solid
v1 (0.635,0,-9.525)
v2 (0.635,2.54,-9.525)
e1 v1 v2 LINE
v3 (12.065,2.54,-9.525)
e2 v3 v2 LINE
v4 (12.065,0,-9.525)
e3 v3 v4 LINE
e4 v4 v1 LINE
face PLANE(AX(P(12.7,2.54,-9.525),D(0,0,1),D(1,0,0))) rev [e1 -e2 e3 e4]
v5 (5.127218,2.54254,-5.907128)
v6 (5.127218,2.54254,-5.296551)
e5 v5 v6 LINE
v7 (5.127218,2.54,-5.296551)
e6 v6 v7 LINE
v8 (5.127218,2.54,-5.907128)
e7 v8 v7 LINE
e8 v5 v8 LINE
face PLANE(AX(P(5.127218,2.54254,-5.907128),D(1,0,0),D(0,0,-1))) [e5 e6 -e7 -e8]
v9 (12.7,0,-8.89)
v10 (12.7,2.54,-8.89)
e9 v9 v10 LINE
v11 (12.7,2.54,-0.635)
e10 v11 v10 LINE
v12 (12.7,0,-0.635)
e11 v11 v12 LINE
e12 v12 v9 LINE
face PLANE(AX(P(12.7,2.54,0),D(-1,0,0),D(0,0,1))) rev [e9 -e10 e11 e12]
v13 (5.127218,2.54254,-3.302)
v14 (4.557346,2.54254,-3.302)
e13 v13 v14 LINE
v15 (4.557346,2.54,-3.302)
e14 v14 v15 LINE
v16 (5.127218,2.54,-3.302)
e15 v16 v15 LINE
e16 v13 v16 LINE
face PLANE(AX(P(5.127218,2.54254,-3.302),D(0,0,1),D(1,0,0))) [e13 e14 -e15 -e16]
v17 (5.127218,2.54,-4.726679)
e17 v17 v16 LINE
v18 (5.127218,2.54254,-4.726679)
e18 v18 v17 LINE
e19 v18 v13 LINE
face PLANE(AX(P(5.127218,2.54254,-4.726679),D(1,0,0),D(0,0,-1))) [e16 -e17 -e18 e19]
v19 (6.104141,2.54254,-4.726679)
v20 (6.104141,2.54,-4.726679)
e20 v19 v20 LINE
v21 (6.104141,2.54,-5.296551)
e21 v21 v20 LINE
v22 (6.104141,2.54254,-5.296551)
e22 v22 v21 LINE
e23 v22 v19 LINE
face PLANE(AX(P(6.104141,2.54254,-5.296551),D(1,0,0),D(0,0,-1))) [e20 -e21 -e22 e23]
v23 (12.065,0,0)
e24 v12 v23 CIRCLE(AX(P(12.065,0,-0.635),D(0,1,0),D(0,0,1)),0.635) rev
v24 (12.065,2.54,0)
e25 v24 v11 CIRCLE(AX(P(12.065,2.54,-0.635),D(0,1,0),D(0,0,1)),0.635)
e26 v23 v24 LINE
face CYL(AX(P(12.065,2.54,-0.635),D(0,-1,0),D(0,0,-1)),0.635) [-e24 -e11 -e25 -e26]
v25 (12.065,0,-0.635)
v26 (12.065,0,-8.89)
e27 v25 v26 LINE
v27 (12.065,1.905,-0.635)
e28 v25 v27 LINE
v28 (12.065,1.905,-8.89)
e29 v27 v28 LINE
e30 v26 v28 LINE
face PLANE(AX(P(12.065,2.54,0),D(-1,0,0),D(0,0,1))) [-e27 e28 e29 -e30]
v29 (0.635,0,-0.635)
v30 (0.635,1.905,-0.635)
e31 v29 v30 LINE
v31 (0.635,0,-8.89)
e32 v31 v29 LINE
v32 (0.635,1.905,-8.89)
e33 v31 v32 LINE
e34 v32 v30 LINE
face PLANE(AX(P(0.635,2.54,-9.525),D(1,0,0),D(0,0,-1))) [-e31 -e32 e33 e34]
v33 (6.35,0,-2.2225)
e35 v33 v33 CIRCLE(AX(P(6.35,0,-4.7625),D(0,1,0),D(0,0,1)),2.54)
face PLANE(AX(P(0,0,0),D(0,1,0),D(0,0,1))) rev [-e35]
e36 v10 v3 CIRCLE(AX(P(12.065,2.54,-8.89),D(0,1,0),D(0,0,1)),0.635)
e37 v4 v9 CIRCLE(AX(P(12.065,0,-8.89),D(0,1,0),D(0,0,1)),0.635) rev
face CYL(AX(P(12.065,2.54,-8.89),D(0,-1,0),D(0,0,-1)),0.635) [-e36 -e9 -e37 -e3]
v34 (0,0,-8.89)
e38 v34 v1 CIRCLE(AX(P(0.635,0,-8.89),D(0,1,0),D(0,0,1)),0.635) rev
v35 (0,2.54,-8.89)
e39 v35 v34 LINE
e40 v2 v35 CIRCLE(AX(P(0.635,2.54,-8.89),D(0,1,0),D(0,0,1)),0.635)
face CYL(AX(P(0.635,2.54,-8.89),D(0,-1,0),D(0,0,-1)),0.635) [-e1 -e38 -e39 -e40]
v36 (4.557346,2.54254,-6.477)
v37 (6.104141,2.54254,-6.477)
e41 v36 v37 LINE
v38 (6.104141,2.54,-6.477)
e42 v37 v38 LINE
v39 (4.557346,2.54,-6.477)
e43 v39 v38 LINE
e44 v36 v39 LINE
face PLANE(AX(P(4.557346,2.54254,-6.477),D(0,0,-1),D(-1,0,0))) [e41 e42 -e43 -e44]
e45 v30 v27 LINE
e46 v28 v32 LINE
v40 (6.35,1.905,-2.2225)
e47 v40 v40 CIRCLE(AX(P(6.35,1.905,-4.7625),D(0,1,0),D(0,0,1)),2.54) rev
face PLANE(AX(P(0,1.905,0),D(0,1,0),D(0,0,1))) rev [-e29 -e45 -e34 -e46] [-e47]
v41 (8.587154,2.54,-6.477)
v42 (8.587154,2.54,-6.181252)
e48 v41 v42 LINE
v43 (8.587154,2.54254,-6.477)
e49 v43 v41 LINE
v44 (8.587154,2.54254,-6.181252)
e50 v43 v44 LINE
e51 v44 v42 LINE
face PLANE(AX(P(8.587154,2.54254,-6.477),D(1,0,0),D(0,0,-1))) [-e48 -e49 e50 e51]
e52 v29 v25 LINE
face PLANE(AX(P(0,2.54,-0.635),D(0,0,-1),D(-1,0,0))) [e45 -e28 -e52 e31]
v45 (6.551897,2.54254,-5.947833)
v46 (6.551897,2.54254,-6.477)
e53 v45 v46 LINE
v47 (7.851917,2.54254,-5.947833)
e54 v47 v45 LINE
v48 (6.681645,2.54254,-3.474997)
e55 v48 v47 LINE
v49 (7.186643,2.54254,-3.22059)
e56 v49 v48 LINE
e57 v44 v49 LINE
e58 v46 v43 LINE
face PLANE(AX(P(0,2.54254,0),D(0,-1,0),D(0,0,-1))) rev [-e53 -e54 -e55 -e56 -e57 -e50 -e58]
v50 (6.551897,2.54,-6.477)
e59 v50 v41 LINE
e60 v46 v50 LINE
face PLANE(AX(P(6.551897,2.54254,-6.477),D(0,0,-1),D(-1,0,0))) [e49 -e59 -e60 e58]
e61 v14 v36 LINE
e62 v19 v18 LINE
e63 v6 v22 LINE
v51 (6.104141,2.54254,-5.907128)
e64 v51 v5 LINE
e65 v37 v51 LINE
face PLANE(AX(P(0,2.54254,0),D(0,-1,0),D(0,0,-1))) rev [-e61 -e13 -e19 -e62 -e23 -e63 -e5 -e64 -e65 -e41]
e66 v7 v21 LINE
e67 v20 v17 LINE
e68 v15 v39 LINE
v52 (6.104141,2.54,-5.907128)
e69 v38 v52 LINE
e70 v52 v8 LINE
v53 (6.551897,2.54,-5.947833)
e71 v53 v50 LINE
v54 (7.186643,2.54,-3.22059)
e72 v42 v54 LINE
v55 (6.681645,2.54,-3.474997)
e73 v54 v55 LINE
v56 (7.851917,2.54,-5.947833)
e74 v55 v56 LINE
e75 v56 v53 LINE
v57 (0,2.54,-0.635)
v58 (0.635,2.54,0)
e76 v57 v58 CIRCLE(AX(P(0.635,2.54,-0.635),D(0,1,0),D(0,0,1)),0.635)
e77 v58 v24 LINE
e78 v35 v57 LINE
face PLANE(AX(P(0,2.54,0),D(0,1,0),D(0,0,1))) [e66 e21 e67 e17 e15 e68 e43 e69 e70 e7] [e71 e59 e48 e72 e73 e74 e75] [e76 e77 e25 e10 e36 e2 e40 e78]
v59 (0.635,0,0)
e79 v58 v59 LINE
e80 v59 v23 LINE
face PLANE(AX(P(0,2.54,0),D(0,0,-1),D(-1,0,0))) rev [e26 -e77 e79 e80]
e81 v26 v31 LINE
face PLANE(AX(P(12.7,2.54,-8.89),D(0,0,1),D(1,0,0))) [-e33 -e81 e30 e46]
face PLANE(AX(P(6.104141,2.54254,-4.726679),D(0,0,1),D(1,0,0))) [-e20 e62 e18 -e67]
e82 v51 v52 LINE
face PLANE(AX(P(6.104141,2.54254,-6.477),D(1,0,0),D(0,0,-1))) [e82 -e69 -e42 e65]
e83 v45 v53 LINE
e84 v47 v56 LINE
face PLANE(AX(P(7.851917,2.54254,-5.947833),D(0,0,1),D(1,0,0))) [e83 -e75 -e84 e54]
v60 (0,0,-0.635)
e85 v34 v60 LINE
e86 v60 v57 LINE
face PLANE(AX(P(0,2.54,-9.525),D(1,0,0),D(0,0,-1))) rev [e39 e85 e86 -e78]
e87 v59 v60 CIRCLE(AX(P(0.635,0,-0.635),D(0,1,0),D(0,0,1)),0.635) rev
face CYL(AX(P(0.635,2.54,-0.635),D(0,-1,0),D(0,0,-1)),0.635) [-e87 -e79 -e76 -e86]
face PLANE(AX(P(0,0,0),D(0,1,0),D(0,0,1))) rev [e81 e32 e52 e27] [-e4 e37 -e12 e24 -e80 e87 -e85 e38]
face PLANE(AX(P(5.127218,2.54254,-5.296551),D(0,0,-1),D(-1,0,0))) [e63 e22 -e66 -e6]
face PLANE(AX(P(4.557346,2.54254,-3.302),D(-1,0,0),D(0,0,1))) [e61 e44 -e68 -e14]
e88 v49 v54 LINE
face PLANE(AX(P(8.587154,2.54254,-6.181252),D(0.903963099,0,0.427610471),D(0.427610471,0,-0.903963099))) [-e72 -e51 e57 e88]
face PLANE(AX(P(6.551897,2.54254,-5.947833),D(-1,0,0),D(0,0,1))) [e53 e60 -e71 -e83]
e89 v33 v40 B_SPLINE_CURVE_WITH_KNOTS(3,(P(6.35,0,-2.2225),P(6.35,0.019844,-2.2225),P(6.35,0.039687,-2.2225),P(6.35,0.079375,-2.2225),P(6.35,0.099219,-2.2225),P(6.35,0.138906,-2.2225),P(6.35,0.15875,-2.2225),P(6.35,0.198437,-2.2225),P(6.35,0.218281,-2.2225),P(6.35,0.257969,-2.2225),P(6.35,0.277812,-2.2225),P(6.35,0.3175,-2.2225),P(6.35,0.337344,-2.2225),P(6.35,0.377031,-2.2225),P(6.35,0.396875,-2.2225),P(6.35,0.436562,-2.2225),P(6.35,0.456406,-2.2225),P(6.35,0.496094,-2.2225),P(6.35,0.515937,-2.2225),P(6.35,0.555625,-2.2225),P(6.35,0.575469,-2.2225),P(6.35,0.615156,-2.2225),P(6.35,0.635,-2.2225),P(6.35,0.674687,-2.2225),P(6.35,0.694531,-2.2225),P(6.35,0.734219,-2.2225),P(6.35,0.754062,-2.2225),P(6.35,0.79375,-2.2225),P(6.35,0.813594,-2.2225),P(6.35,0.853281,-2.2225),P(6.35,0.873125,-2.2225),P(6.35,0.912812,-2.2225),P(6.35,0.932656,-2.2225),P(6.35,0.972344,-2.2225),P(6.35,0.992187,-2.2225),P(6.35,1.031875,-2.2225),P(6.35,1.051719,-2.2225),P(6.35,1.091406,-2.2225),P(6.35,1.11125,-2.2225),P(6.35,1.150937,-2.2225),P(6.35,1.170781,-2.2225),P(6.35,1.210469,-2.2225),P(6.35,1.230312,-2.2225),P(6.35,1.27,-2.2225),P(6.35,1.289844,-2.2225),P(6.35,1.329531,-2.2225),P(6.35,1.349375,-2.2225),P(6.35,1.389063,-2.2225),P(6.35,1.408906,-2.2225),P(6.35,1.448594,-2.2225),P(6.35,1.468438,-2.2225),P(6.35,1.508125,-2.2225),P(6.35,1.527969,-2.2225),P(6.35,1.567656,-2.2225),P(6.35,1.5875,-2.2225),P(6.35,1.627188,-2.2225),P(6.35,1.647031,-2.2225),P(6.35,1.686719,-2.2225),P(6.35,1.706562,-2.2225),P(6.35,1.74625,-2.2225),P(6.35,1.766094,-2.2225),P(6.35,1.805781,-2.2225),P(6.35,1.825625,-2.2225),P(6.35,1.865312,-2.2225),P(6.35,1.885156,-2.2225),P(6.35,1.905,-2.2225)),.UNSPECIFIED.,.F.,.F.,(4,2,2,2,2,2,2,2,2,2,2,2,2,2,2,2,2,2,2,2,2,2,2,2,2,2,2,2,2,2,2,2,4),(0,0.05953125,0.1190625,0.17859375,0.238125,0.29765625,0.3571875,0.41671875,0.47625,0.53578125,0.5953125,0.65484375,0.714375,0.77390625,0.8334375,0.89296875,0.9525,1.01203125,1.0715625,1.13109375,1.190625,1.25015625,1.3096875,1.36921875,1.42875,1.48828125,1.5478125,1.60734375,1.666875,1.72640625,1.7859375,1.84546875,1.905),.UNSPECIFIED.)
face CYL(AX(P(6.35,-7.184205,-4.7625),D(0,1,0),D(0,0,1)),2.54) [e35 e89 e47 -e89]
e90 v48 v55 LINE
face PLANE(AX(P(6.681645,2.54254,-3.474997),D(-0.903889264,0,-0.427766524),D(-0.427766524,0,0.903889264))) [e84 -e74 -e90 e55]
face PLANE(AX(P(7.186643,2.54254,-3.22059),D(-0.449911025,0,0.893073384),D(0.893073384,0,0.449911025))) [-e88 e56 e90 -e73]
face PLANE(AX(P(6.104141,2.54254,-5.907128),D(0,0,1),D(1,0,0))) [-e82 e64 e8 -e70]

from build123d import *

# Parameters (mm, degrees)
SKETCH1_W           = 12.7
SKETCH1_H           = 9.525
BOSS_EXTRUDE1_DEPTH = 2.54
FILLET1_R           = 0.635
SHELL1_START        = 0.635
SHELL1_OUTLINE_W    = 1.905
SHELL1_OUTLINE_H    = 8.255
SHELL1_DEPTH        = 11.43
SKETCH2_R           = 2.54
BOSS_EXTRUDE2_DEPTH = 1.905
BOSS_EXTRUDE3_DEPTH = 0.00254


# Read off the part's stored shape, not the designer's step: Shell1
with BuildPart() as part:
    # Sketch1 → Boss-Extrude1 (new body)
    with BuildSketch(Plane(origin=(0, 0, 0), x_dir=(1, 0, 0), z_dir=(0, 1, 0))):
        with Locations((6.35, 4.7625)):
            Rectangle(SKETCH1_W, SKETCH1_H)
    extrude(amount=BOSS_EXTRUDE1_DEPTH)

    # Fillet1
    fillet1_edges = [part.edges().sort_by_distance(p)[0] for p in [
        (0, 1.27, -9.525),
        (12.7, 1.27, -9.525),
        (12.7, 1.27, 0),
        (0, 1.27, 0),
    ]]
    fillet(fillet1_edges, radius=FILLET1_R)

    # Shell1 outline → Shell1 (cut)
    with BuildSketch(Plane.YZ.offset(SHELL1_START)):
        with Locations((0.9525, -4.7625)):
            Rectangle(SHELL1_OUTLINE_W, SHELL1_OUTLINE_H)
    extrude(amount=SHELL1_DEPTH, mode=Mode.SUBTRACT)

    # Sketch2 → Boss-Extrude2 (add)
    with BuildSketch(Plane(origin=(0, 1.905, 0), x_dir=(-1, 0, 0), z_dir=(0, -1, 0))):
        with Locations(Location((-6.35, 4.7625, 0), (0, 0, 270))):
            Circle(SKETCH2_R)
    extrude(amount=BOSS_EXTRUDE2_DEPTH)

    # Sketch3 → Boss-Extrude3 (add)
    with BuildSketch(Plane(origin=(0, 2.54, 0), x_dir=(1, 0, 0), z_dir=(0, 1, 0))):
        Polygon((4.557346154, 6.477), (6.104141026, 6.477), (6.104141026, 5.907128205), (5.127217949, 5.907128205), (5.127217949, 5.296551282), (6.104141026, 5.296551282), (6.104141026, 4.726679487), (5.127217949, 4.726679487), (5.127217949, 3.302), (4.557346154, 3.302), align=None)
        Polygon((6.551897436, 6.477), (8.587153846, 6.477), (8.587153846, 6.181251803), (7.186643029, 3.220589744), (6.681645032, 3.474996795), (7.851917468, 5.947833333), (6.551897436, 5.947833333), align=None)
    extrude(amount=BOSS_EXTRUDE3_DEPTH)


solid = part.part
